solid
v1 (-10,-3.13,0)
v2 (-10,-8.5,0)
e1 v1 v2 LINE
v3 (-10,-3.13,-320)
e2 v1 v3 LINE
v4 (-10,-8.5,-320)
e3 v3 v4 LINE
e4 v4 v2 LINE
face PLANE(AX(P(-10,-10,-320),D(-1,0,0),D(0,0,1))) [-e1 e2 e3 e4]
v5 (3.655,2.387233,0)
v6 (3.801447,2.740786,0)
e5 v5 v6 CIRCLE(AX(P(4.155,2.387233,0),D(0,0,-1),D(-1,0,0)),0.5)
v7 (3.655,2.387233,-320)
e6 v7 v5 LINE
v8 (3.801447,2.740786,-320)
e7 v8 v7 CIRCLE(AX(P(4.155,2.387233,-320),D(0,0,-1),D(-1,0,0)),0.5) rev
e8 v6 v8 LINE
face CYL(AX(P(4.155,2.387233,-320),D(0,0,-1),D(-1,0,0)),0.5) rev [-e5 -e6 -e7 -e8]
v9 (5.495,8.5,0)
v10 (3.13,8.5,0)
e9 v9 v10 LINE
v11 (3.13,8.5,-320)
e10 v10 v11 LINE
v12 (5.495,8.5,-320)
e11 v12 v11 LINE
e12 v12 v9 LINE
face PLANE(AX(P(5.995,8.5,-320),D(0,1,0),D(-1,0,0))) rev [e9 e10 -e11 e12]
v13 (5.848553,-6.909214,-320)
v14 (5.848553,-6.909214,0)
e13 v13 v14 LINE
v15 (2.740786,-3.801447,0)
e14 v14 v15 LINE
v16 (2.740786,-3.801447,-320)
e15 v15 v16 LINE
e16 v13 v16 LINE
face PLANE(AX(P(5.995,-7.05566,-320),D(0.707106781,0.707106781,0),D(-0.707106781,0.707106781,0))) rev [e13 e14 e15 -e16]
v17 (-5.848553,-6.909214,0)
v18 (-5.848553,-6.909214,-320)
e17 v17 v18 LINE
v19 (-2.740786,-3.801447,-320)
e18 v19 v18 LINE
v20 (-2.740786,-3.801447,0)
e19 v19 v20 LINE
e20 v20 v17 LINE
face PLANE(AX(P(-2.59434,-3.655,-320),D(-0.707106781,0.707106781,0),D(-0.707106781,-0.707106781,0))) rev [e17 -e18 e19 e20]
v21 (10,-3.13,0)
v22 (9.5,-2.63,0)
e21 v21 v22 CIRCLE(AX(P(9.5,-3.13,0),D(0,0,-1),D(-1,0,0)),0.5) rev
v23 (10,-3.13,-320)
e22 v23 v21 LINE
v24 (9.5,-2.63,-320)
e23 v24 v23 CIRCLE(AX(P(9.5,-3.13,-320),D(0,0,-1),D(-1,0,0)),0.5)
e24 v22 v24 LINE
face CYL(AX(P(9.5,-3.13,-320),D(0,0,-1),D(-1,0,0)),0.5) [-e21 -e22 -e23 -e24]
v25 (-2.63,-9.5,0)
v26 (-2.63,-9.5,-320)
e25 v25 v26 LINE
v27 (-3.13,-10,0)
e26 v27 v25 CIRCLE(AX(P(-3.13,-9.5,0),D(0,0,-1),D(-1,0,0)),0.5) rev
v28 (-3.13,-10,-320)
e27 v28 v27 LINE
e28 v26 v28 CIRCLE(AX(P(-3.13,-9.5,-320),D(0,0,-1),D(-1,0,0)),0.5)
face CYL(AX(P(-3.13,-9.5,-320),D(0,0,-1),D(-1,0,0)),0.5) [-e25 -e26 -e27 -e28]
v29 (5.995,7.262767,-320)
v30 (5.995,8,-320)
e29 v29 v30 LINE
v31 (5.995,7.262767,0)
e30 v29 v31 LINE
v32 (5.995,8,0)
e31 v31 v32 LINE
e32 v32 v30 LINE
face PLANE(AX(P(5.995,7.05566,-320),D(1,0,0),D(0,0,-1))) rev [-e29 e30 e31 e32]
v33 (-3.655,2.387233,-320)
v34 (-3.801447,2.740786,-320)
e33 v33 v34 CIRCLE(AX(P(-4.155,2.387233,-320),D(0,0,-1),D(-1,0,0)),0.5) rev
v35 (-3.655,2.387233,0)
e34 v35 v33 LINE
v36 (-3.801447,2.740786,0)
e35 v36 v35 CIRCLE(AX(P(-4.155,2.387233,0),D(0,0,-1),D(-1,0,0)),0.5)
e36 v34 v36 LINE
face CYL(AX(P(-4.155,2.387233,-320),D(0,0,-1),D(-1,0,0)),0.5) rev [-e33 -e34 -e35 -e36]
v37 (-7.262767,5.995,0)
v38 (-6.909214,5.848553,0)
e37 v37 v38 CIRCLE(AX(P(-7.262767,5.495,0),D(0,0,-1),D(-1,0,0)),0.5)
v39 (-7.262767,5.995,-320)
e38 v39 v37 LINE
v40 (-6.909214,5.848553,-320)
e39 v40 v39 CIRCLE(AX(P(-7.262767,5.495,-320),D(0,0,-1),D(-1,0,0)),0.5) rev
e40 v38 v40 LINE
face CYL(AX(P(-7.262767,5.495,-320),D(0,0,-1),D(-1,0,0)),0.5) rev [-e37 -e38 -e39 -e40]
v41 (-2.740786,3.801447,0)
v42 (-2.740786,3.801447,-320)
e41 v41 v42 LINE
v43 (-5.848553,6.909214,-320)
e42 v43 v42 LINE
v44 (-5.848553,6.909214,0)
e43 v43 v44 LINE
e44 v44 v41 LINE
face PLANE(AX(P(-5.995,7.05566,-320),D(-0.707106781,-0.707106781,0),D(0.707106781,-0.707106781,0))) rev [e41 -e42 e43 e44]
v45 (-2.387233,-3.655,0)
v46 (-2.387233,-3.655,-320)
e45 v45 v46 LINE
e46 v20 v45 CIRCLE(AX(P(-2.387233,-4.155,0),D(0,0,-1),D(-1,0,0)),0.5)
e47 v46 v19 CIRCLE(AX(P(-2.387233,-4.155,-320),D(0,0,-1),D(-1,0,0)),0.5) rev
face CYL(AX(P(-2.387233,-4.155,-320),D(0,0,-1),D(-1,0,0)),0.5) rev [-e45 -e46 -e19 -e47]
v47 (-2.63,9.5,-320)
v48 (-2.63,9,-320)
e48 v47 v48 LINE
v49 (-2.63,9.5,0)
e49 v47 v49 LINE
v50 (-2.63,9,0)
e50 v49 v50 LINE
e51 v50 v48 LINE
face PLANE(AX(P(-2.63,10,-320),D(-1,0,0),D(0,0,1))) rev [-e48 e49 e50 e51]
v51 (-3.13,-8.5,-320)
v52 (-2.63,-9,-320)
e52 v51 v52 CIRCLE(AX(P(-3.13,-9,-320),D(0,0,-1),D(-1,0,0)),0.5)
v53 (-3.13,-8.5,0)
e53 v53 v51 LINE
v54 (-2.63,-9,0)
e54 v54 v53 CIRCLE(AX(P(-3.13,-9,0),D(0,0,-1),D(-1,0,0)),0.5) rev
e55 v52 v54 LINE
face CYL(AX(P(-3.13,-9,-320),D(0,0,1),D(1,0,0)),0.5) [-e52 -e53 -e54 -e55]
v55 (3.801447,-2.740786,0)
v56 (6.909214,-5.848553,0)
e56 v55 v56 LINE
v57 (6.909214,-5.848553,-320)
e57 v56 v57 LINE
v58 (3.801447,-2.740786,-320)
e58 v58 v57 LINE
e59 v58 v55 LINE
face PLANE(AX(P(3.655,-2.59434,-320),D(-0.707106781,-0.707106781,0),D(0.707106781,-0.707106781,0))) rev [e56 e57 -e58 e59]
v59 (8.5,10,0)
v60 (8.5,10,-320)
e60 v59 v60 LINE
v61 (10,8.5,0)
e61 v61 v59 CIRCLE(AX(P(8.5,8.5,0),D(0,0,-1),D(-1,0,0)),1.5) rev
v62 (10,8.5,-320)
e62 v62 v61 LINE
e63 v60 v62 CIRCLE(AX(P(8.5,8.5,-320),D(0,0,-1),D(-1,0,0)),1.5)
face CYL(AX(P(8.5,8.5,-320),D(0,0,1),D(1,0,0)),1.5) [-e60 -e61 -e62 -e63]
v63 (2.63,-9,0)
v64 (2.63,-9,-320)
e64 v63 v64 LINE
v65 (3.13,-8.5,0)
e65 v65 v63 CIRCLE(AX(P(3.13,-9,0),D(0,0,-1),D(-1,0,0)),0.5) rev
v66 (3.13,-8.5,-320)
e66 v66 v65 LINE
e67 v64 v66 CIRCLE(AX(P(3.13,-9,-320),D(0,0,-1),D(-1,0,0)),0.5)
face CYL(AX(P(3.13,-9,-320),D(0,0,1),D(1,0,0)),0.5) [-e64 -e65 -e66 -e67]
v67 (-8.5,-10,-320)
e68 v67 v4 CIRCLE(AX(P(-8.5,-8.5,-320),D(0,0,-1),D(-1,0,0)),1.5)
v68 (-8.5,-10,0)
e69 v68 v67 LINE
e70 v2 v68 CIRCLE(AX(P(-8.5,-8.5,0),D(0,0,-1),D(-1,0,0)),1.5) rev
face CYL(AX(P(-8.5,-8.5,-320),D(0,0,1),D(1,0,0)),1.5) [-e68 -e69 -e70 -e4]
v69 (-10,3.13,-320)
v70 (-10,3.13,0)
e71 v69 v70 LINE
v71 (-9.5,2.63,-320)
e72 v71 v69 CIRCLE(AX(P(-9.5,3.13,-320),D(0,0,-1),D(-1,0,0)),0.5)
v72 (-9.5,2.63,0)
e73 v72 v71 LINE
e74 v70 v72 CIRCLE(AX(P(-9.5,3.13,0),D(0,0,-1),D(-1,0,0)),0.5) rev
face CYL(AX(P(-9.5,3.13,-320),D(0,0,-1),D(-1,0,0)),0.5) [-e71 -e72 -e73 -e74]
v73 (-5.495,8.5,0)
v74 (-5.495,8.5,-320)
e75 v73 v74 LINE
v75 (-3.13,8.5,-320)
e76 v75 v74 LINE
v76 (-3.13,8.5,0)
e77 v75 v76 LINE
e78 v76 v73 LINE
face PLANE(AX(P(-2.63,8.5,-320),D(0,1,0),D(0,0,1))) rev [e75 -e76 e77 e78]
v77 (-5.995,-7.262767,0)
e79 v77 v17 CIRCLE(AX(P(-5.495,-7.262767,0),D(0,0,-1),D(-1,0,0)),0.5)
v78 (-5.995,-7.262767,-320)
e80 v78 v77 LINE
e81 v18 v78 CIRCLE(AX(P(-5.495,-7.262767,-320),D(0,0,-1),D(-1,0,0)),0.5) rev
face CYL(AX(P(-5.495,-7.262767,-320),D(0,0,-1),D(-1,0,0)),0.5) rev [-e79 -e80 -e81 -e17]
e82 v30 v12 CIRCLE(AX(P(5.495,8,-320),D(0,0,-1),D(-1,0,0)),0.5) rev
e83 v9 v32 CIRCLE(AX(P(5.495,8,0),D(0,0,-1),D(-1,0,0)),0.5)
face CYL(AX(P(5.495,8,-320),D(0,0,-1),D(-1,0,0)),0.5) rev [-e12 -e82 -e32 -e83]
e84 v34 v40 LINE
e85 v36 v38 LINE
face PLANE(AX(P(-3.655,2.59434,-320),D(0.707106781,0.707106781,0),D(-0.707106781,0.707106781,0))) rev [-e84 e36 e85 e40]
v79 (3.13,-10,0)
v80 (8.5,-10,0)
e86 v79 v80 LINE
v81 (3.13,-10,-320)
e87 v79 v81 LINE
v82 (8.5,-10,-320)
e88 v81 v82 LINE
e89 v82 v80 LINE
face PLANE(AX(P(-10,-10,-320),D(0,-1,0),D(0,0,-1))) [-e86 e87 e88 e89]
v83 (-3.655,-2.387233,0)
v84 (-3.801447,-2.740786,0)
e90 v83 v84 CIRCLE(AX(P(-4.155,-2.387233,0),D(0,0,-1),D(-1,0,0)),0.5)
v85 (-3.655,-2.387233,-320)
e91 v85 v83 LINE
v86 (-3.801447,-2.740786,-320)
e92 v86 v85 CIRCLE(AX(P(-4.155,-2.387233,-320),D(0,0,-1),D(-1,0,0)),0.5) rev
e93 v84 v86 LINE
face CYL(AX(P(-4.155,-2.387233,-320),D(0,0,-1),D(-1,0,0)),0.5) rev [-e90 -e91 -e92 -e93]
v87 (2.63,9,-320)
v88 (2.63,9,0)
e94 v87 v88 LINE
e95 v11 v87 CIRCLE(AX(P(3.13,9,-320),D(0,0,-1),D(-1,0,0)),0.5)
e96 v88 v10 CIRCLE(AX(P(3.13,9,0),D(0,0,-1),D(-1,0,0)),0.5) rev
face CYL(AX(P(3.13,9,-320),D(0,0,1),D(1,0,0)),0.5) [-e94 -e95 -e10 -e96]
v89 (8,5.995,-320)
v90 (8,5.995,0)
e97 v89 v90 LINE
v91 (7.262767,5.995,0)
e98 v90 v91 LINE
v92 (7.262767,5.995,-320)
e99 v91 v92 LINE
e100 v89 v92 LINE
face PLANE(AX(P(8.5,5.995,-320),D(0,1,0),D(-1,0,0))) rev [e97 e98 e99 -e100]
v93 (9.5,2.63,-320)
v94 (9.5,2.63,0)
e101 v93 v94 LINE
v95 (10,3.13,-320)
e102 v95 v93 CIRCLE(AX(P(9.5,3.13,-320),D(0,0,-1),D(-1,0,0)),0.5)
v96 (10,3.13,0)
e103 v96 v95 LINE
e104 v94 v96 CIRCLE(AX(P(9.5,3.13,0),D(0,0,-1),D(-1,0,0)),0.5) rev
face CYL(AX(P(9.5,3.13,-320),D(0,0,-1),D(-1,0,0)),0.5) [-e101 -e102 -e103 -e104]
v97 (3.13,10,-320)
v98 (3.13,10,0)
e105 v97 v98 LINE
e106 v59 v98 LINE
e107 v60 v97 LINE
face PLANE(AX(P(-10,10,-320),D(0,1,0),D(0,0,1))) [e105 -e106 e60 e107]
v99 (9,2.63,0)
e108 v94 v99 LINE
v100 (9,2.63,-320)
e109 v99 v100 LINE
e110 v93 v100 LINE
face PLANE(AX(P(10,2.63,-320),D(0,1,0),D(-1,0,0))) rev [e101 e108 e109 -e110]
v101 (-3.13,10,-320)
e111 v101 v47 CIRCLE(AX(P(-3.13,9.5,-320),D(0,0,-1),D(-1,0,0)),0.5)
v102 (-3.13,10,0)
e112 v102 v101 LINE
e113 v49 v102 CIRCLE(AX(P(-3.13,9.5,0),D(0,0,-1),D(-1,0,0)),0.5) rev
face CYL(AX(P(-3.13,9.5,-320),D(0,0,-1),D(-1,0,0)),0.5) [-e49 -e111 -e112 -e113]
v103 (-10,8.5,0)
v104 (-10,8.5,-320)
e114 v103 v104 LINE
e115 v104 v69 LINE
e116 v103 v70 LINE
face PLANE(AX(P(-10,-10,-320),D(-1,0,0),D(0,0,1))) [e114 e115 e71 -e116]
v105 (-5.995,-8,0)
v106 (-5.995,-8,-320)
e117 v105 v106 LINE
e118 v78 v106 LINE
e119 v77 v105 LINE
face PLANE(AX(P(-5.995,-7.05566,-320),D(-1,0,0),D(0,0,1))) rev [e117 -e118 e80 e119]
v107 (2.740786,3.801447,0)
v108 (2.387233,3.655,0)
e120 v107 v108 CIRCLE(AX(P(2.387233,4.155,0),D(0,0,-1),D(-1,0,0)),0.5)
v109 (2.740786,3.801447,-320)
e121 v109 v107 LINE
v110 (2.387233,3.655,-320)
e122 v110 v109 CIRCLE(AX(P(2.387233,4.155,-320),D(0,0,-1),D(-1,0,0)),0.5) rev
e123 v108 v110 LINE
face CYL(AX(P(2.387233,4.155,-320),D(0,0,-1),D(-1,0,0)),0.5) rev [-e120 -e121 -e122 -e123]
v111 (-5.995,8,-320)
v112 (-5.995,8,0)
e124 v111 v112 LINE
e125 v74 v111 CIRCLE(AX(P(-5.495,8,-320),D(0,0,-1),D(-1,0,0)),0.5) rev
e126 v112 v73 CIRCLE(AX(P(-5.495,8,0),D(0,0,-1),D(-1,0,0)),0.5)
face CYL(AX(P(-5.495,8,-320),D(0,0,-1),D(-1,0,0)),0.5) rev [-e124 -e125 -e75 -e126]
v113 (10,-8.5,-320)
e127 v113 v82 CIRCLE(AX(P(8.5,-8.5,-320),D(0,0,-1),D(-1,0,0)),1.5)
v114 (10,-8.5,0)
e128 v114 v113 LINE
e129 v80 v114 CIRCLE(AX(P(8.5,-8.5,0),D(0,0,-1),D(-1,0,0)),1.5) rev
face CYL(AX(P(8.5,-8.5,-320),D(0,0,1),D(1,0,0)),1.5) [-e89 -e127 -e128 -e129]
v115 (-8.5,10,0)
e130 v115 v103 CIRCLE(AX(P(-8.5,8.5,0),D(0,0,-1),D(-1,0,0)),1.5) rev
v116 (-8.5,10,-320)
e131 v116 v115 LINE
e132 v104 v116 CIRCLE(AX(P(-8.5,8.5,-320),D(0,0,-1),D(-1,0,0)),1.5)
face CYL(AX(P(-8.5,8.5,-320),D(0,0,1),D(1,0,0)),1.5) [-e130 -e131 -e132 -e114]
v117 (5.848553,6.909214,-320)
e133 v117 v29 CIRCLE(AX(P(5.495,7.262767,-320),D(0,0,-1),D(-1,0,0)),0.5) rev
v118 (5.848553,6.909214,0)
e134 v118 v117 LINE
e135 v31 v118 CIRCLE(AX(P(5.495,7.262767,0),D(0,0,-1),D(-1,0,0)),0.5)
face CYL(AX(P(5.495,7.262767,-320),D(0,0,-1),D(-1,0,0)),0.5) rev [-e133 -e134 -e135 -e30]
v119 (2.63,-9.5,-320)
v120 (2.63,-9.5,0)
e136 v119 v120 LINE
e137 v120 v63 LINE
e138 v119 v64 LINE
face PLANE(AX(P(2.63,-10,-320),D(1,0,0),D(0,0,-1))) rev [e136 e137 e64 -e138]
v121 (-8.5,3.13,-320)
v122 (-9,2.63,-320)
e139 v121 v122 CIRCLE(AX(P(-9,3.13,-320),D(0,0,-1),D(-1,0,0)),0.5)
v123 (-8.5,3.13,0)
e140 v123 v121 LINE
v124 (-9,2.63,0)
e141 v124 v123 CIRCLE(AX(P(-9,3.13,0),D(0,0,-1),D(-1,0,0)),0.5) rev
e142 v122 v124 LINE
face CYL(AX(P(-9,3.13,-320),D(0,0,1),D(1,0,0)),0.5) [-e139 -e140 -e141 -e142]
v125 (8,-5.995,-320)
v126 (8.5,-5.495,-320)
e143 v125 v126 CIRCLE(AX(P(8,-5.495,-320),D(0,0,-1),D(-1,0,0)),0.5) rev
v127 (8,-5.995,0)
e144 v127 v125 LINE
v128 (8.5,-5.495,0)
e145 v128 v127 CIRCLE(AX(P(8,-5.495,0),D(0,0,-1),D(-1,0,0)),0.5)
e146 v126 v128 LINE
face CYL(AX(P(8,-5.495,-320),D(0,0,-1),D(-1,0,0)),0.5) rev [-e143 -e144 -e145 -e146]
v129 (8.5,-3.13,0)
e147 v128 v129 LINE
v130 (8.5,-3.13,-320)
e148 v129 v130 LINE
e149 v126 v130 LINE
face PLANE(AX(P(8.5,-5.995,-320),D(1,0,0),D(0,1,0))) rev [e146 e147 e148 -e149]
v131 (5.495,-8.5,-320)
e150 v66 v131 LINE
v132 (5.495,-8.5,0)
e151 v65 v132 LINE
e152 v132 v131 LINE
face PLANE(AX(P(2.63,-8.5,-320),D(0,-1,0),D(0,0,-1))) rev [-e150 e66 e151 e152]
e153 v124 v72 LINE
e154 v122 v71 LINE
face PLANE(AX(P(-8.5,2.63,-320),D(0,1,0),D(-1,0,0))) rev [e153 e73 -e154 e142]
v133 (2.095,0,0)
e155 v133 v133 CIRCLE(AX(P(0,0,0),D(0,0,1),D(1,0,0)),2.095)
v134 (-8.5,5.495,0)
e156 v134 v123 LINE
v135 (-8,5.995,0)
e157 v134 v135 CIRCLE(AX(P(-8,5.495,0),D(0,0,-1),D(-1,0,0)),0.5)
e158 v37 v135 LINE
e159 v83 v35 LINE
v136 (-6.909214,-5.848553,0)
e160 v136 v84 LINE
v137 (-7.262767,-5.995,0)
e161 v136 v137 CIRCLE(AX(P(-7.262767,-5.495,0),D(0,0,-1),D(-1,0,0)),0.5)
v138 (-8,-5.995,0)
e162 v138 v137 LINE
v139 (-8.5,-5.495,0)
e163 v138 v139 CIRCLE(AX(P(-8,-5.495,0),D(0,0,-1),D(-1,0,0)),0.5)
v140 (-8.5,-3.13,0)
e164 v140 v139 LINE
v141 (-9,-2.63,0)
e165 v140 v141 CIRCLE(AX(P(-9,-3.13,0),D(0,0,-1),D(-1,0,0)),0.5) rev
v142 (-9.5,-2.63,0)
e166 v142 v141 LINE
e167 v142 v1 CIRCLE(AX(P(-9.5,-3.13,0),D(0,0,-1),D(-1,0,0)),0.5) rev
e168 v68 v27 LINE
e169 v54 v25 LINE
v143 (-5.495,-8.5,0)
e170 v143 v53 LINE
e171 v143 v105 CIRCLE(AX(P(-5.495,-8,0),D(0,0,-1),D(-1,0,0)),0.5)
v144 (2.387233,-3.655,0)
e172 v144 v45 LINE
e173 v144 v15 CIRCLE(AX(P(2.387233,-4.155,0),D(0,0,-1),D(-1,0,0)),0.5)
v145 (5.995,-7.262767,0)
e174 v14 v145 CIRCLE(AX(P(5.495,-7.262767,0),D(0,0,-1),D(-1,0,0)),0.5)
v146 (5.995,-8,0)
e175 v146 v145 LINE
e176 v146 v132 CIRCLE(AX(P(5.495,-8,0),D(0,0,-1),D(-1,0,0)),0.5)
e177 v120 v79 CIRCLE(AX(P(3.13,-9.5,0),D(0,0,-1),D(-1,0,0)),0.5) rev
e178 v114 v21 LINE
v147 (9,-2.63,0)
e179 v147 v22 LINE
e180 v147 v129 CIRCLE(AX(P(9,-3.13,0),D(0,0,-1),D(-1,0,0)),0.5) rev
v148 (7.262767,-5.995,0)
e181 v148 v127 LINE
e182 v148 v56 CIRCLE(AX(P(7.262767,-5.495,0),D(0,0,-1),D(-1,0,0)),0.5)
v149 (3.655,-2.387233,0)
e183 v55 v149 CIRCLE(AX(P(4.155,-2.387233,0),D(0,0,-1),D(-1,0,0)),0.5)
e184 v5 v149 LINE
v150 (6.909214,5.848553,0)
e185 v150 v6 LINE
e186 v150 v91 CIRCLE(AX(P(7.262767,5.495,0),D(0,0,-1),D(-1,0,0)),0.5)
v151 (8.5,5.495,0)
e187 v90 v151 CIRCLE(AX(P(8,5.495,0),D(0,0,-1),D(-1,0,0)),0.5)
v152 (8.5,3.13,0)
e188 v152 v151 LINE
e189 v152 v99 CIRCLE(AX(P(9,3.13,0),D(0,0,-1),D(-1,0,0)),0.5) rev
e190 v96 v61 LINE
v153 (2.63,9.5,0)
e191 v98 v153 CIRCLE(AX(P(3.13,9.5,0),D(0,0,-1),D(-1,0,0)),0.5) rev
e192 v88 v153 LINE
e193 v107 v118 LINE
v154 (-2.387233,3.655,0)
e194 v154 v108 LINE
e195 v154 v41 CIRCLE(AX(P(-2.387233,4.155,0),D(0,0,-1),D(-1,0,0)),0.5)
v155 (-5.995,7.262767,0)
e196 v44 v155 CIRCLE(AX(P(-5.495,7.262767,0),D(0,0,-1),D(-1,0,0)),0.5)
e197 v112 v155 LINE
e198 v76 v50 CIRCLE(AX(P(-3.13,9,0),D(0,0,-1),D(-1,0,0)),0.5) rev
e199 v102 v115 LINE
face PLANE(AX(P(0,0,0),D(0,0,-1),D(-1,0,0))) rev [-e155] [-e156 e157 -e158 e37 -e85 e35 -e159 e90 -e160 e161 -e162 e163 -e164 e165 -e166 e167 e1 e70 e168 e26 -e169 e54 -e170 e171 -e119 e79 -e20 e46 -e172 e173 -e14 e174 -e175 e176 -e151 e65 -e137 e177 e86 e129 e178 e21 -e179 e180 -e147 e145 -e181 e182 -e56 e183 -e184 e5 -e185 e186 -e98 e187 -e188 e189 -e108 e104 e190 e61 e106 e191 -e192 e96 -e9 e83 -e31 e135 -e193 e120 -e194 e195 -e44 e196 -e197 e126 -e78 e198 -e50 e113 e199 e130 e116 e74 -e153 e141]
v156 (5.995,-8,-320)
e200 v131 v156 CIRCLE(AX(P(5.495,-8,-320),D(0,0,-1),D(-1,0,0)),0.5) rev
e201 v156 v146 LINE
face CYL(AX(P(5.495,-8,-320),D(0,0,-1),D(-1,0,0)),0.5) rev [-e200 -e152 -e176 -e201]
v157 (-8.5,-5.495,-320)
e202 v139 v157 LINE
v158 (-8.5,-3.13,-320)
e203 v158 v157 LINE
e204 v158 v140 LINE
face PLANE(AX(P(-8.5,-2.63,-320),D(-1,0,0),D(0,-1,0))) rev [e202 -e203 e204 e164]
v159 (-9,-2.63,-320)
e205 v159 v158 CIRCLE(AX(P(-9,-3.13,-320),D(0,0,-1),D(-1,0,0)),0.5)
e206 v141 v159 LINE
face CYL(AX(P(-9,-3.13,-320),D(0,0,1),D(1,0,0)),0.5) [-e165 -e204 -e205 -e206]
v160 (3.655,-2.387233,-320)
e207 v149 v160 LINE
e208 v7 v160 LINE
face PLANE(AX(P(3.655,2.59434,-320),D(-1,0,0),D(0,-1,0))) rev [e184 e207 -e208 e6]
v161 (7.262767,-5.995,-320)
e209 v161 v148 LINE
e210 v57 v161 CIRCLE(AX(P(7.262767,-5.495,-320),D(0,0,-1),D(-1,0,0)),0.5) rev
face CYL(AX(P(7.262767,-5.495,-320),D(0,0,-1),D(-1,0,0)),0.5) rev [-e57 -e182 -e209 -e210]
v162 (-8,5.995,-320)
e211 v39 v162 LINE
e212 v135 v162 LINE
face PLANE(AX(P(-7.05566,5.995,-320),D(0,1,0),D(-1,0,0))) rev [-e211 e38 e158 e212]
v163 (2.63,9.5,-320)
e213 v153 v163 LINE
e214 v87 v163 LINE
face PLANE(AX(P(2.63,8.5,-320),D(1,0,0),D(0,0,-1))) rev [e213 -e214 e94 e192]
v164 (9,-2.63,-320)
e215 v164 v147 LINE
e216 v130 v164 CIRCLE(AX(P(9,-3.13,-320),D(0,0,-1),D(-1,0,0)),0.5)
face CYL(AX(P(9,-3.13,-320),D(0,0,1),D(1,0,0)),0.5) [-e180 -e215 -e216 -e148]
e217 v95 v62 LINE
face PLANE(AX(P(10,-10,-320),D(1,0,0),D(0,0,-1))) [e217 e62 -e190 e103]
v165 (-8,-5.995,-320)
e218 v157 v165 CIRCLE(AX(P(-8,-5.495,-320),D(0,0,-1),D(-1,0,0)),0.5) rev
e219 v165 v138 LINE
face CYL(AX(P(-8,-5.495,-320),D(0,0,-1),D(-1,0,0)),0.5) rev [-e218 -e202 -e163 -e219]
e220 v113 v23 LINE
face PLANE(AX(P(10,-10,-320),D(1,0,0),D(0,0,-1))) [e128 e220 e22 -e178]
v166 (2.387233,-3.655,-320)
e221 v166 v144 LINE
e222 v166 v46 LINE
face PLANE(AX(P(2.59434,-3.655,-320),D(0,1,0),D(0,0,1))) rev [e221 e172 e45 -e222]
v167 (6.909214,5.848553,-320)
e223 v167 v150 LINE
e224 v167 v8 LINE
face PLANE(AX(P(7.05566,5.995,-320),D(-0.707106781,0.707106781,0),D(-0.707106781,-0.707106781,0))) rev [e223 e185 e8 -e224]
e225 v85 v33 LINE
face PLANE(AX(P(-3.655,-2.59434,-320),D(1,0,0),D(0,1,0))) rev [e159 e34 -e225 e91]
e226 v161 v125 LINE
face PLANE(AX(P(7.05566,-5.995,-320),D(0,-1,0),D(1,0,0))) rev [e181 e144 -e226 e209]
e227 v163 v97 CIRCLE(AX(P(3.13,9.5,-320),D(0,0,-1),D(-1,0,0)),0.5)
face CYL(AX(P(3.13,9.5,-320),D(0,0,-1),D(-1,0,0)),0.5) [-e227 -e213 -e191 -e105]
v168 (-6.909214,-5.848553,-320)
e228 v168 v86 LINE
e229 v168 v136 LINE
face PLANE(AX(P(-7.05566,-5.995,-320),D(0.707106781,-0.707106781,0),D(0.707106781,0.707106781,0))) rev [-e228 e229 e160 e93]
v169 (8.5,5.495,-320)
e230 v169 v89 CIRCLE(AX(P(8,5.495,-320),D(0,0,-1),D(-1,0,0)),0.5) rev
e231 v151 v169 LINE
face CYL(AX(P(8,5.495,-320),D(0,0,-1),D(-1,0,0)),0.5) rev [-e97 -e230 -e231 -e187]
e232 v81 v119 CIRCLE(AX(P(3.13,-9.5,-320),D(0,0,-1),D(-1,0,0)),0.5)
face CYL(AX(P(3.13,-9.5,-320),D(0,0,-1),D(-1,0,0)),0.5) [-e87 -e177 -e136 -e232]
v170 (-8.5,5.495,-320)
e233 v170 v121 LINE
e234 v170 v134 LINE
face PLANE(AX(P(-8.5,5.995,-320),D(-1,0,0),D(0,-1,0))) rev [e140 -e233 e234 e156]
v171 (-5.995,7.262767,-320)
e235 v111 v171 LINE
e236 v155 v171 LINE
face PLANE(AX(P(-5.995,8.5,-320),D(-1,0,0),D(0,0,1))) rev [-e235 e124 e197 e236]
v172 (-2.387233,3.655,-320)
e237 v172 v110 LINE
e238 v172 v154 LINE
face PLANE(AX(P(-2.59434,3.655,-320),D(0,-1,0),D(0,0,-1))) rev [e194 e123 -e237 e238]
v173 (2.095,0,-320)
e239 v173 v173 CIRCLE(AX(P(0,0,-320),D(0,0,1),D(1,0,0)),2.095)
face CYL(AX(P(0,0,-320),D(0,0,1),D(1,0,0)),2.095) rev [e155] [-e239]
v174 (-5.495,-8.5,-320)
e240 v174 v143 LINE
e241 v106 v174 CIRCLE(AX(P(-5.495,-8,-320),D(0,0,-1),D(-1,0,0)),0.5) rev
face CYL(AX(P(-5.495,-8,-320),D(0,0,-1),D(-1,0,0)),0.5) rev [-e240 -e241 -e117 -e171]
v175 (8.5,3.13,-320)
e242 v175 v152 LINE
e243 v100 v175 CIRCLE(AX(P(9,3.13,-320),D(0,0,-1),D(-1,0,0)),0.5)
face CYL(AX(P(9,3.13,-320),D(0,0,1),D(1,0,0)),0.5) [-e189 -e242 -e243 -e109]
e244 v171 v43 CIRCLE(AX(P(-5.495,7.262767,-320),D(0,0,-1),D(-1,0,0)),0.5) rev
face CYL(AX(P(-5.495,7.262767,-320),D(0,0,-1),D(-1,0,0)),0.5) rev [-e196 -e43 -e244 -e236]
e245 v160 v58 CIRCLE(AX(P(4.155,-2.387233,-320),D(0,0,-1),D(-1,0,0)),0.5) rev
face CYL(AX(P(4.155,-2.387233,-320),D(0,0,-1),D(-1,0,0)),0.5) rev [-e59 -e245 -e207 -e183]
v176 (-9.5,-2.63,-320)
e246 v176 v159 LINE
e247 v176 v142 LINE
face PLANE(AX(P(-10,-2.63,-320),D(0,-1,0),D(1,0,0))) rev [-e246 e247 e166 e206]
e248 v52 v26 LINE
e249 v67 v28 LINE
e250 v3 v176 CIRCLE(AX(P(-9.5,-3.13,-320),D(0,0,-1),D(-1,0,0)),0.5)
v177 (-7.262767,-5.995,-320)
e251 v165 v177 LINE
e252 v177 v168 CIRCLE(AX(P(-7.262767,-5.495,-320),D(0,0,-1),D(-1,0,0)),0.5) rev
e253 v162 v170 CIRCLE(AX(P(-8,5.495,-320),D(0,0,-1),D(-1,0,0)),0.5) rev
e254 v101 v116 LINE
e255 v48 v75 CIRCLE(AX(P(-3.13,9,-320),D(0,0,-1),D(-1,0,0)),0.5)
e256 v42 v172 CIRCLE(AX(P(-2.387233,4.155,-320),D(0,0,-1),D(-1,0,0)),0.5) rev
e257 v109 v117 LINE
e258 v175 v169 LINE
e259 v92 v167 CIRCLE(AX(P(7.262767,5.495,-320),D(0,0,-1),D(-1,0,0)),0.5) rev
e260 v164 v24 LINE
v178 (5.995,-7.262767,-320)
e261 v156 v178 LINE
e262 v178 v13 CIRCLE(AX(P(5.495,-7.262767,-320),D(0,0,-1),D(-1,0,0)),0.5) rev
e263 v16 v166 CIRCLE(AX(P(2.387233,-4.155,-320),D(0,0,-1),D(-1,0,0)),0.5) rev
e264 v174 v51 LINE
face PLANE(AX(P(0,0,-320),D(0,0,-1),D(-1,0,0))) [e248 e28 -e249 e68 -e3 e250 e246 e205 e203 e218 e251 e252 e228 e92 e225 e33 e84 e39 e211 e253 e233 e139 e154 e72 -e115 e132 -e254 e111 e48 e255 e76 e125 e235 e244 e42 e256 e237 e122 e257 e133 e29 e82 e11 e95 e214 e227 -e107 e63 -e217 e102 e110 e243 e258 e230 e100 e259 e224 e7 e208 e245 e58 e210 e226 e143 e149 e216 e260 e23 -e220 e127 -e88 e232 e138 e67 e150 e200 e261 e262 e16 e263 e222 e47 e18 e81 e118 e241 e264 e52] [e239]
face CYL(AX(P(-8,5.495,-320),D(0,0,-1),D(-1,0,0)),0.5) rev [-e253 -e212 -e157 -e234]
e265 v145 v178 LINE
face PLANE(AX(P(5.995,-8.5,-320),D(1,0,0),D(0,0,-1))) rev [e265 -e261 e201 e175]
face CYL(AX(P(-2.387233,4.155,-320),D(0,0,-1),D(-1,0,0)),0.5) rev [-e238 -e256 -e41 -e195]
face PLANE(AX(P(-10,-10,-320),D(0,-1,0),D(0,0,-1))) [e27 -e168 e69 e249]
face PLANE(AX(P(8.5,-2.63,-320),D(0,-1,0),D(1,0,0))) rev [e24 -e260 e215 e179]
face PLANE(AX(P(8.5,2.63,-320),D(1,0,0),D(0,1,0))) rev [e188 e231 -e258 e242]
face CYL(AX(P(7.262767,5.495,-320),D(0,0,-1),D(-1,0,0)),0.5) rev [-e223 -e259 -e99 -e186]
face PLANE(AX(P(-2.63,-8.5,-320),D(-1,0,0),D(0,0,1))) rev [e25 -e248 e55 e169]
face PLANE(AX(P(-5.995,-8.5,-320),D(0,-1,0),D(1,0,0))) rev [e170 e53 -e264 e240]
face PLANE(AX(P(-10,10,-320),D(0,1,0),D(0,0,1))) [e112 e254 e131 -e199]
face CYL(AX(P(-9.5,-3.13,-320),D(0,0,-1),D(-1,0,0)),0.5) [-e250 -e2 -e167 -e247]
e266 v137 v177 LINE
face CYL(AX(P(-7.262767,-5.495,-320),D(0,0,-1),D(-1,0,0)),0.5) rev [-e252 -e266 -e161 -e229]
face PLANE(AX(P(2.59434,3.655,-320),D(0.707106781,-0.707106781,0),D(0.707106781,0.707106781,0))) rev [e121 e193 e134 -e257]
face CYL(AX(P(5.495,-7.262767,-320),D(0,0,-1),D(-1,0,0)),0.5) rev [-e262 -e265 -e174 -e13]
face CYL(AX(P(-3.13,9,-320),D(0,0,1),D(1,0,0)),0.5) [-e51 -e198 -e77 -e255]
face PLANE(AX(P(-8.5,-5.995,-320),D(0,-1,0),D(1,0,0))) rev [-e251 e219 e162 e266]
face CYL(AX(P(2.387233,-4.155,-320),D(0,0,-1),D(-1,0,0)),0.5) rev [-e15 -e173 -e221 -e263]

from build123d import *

# Parameters (mm, degrees)
SKETCH1_W           = 20
SKETCH1_H           = 20
BOSS_EXTRUDE1_DEPTH = 320
CUT_EXTRUDE1_DEPTH  = 321.312347561
FILLET1_R           = 0.5
CIRPATTERN1_START   = -320
CIRPATTERN1_DEPTH   = 320
FILLET2_R           = 1.5
SKETCH3_R           = 2.095
CUT_EXTRUDE2_DEPTH  = 321.312347561
FILLET3_R           = 0.5


# Read off the part's stored shape, not the designer's step: CirPattern1
with BuildPart() as part:
    # Sketch1 → Boss-Extrude1 (new body)
    with BuildSketch(Plane.XY):
        Rectangle(SKETCH1_W, SKETCH1_H)
    extrude(amount=-BOSS_EXTRUDE1_DEPTH)

    # Sketch2 → Cut-Extrude1 (cut, through all)
    with BuildSketch(Plane.XY):
        Polygon((0, 10), (-2.63, 10), (-2.63, 8.5), (-5.995, 8.5), (-5.995, 7.055660172), (-2.594339828, 3.655), (2.594339828, 3.655), (5.995, 7.055660172), (5.995, 8.5), (2.63, 8.5), (2.63, 10), align=None)
    extrude(amount=-CUT_EXTRUDE1_DEPTH, mode=Mode.SUBTRACT)

    # Fillet1
    fillet1_edges = [part.edges().sort_by_distance(p)[0] for p in [
        (2.63, 10, -160),
        (2.63, 8.5, -160),
        (5.995, 8.5, -160),
        (5.995, 7.055660172, -160),
        (2.594339828, 3.655, -160),
        (-2.594339828, 3.655, -160),
        (-5.995, 7.055660172, -160),
        (-5.995, 8.5, -160),
        (-2.63, 8.5, -160),
        (-2.63, 10, -160),
    ]]
    fillet(fillet1_edges, radius=FILLET1_R)

    # CirPattern1 outline → CirPattern1 (cut)
    with BuildSketch(Plane.XY.offset(CIRPATTERN1_START)):
        with BuildLine():
            Line((-2.63, -10), (2.63, -10))
            Line((2.63, -10), (2.63, -9))
            ThreePointArc((2.63, -9), (2.776446609, -8.646446609), (3.13, -8.5))
            Line((3.13, -8.5), (5.495, -8.5))
            ThreePointArc((5.495, -8.5), (5.848553391, -8.353553391), (5.995, -8))
            Line((5.995, -8), (5.995, -7.262766953))
            ThreePointArc((5.995, -7.262766953), (5.956939766, -7.071425237), (5.848553391, -6.909213562))
            Line((5.848553391, -6.909213562), (2.740786438, -3.801446609))
            ThreePointArc((2.740786438, -3.801446609), (2.578574763, -3.693060234), (2.387233047, -3.655))
            Line((2.387233047, -3.655), (-2.387233047, -3.655))
            ThreePointArc((-2.387233047, -3.655), (-2.578574763, -3.693060234), (-2.740786438, -3.801446609))
            Line((-2.740786438, -3.801446609), (-5.848553391, -6.909213562))
            ThreePointArc((-5.848553391, -6.909213562), (-5.956939766, -7.071425237), (-5.995, -7.262766953))
            Line((-5.995, -7.262766953), (-5.995, -8))
            ThreePointArc((-5.995, -8), (-5.848553391, -8.353553391), (-5.495, -8.5))
            Line((-5.495, -8.5), (-3.13, -8.5))
            ThreePointArc((-3.13, -8.5), (-2.776446609, -8.646446609), (-2.63, -9))
            Line((-2.63, -9), (-2.63, -10))
        make_face()
        with BuildLine():
            Line((-10, 2.63), (-10, -2.63))
            Line((-10, -2.63), (-9, -2.63))
            ThreePointArc((-9, -2.63), (-8.646446609, -2.776446609), (-8.5, -3.13))
            Line((-8.5, -3.13), (-8.5, -5.495))
            ThreePointArc((-8.5, -5.495), (-8.353553391, -5.848553391), (-8, -5.995))
            Line((-8, -5.995), (-7.262766953, -5.995))
            ThreePointArc((-7.262766953, -5.995), (-7.071425237, -5.956939766), (-6.909213562, -5.848553391))
            Line((-6.909213562, -5.848553391), (-3.801446609, -2.740786438))
            ThreePointArc((-3.801446609, -2.740786438), (-3.693060234, -2.578574763), (-3.655, -2.387233047))
            Line((-3.655, -2.387233047), (-3.655, 2.387233047))
            ThreePointArc((-3.655, 2.387233047), (-3.693060234, 2.578574763), (-3.801446609, 2.740786438))
            Line((-3.801446609, 2.740786438), (-6.909213562, 5.848553391))
            ThreePointArc((-6.909213562, 5.848553391), (-7.071425237, 5.956939766), (-7.262766953, 5.995))
            Line((-7.262766953, 5.995), (-8, 5.995))
            ThreePointArc((-8, 5.995), (-8.353553391, 5.848553391), (-8.5, 5.495))
            Line((-8.5, 5.495), (-8.5, 3.13))
            ThreePointArc((-8.5, 3.13), (-8.646446609, 2.776446609), (-9, 2.63))
            Line((-9, 2.63), (-10, 2.63))
        make_face()
        with BuildLine():
            Line((9, -2.63), (10, -2.63))
            Line((10, -2.63), (10, 2.63))
            Line((10, 2.63), (9, 2.63))
            ThreePointArc((9, 2.63), (8.646446609, 2.776446609), (8.5, 3.13))
            Line((8.5, 3.13), (8.5, 5.495))
            ThreePointArc((8.5, 5.495), (8.353553391, 5.848553391), (8, 5.995))
            Line((8, 5.995), (7.262766953, 5.995))
            ThreePointArc((7.262766953, 5.995), (7.071425237, 5.956939766), (6.909213562, 5.848553391))
            Line((6.909213562, 5.848553391), (3.801446609, 2.740786438))
            ThreePointArc((3.801446609, 2.740786438), (3.693060234, 2.578574763), (3.655, 2.387233047))
            Line((3.655, 2.387233047), (3.655, -2.387233047))
            ThreePointArc((3.655, -2.387233047), (3.693060234, -2.578574763), (3.801446609, -2.740786438))
            Line((3.801446609, -2.740786438), (6.909213562, -5.848553391))
            ThreePointArc((6.909213562, -5.848553391), (7.071425237, -5.956939766), (7.262766953, -5.995))
            Line((7.262766953, -5.995), (8, -5.995))
            ThreePointArc((8, -5.995), (8.353553391, -5.848553391), (8.5, -5.495))
            Line((8.5, -5.495), (8.5, -3.13))
            ThreePointArc((8.5, -3.13), (8.646446609, -2.776446609), (9, -2.63))
        make_face()
    extrude(amount=CIRPATTERN1_DEPTH, mode=Mode.SUBTRACT)

    # Fillet2
    fillet2_edges = [part.edges().sort_by_distance(p)[0] for p in [
        (10, -10, -160),
        (-10, -10, -160),
        (-10, 10, -160),
        (10, 10, -160),
    ]]
    fillet(fillet2_edges, radius=FILLET2_R)

    # Sketch3 → Cut-Extrude2 (cut, through all)
    with BuildSketch(Plane.XY):
        Circle(SKETCH3_R)
    extrude(amount=-CUT_EXTRUDE2_DEPTH, mode=Mode.SUBTRACT)

    # Fillet3
    fillet3_edges = [part.edges().sort_by_distance(p)[0] for p in [
        (-10, 2.63, -160),
        (-10, -2.63, -160),
        (-2.63, -10, -160),
        (2.63, -10, -160),
        (10, -2.63, -160),
        (10, 2.63, -160),
    ]]
    fillet(fillet3_edges, radius=FILLET3_R)


solid = part.part
